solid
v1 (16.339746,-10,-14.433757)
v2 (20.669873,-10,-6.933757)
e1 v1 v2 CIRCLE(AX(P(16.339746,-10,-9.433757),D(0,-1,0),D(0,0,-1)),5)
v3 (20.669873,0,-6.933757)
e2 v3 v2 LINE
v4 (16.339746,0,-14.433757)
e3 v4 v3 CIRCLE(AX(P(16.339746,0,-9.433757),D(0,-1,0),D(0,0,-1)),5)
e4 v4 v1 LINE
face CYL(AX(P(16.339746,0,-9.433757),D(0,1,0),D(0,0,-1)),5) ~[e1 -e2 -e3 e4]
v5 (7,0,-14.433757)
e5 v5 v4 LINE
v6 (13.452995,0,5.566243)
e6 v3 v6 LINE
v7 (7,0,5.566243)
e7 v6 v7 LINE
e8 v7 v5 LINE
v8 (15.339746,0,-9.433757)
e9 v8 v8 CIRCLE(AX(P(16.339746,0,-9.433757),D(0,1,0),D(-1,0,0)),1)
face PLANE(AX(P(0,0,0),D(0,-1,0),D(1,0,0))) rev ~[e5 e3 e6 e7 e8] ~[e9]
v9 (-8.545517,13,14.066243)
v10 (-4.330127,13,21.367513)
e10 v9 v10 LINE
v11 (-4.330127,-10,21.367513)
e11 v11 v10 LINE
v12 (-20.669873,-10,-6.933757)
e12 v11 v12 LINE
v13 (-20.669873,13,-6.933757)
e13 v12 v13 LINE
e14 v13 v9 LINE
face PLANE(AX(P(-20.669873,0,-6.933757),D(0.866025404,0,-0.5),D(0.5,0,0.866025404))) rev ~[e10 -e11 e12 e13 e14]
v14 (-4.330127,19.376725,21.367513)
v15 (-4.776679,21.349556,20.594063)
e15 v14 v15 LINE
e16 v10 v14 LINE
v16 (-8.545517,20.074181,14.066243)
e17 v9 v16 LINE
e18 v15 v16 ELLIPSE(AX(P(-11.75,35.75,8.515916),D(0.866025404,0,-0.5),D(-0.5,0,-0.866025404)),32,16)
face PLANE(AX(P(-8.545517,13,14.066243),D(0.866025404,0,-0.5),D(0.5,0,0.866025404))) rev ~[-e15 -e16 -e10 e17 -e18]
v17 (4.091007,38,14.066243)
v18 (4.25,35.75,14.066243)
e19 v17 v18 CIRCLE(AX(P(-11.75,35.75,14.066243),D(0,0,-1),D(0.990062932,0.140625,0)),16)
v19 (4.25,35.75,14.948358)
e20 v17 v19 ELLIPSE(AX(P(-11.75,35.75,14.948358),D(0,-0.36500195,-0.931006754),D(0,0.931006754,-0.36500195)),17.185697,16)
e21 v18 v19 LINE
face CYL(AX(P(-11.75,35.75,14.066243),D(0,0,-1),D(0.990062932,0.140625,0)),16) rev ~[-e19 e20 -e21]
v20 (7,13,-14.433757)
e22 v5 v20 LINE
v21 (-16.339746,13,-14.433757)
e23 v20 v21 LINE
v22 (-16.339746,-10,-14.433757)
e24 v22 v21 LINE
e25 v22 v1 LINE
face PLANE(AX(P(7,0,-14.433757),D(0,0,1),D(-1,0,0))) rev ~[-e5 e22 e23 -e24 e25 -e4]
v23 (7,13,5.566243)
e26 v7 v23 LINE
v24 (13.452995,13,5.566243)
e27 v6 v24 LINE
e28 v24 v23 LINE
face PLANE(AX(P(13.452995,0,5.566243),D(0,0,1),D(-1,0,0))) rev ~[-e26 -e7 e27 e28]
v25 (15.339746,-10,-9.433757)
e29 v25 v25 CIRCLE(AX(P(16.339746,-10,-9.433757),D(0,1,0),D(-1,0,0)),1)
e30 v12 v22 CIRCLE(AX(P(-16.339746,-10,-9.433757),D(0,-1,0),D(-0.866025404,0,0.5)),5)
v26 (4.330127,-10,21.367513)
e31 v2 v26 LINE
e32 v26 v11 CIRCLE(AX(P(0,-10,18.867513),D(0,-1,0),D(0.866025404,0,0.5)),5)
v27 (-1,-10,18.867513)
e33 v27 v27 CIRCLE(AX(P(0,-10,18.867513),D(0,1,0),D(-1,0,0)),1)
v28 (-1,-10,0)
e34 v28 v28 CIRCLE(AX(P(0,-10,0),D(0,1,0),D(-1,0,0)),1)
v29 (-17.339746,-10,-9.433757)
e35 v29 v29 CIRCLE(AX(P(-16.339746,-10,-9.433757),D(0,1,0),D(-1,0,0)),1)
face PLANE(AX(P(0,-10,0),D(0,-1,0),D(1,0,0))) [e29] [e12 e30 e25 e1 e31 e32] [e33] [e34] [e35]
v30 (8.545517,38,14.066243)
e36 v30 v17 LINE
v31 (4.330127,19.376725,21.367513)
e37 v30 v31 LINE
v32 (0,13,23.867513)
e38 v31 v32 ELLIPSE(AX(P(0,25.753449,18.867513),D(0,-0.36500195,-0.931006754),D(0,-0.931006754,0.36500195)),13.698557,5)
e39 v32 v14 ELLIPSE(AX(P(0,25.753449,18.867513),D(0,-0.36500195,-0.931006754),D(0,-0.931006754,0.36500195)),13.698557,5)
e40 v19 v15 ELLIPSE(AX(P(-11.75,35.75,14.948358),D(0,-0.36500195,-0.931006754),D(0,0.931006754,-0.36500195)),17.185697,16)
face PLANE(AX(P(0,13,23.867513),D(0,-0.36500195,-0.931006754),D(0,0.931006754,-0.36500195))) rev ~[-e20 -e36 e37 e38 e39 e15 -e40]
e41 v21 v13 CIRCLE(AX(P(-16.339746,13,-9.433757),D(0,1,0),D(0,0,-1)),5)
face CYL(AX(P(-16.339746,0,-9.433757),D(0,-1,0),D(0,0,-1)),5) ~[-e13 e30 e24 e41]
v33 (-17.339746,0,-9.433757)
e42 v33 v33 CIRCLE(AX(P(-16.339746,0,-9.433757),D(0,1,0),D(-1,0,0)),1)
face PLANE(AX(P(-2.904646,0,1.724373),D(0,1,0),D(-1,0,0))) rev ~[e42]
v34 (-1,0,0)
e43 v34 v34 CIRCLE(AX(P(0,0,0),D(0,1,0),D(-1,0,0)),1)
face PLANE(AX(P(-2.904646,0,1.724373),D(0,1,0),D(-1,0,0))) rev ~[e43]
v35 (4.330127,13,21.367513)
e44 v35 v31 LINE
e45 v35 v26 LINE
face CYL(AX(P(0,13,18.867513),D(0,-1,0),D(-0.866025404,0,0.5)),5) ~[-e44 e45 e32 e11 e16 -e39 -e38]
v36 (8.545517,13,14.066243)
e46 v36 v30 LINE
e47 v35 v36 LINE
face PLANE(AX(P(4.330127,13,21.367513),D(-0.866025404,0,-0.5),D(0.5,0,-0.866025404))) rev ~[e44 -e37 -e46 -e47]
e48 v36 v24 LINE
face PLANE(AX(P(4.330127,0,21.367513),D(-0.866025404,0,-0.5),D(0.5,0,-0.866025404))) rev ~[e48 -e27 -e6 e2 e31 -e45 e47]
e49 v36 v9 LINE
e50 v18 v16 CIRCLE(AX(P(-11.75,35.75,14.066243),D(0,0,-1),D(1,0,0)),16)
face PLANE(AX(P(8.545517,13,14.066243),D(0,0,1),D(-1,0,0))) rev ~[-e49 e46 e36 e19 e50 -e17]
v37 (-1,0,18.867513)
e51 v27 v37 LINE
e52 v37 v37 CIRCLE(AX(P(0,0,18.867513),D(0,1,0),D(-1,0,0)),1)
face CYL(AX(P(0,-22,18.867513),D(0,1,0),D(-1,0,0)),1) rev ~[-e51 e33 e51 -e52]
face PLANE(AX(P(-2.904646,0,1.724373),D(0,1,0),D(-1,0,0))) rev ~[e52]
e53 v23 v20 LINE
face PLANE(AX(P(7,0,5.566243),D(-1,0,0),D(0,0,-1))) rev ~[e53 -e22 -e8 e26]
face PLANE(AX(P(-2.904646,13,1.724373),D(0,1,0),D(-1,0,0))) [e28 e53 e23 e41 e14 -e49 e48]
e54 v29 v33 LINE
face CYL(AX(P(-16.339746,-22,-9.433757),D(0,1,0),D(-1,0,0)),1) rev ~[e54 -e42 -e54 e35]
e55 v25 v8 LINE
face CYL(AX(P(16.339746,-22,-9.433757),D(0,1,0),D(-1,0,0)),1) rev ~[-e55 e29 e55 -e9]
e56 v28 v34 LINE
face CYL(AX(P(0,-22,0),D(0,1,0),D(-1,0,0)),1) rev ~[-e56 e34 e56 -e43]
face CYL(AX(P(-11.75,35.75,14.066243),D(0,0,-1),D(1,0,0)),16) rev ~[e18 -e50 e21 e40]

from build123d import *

# Parameters (mm, degrees)
F1_DEPTH  = 10
F3_D      = 2
F3_DEPTH  = 12
F3_TIP    = 0.600860619
F4_R      = 1
F5_DEPTH  = 13
F7_DEPTH  = 25
F9_DEPTH  = 9.8022701892
F11_DEPTH = 12.5


with BuildPart() as f1:
    # F0 (on Front) → F1 (new body)
    with BuildSketch(Plane.XZ):
        with BuildLine():
            Line((-4.3301270189, 21.3675134595), (-20.6698729811, -6.9337567297))
            ThreePointArc((-20.6698729811, -6.9337567297), (-20.6698729811, -11.9337567297), (-16.3397459622, -14.4337567297))
            Line((-16.3397459622, -14.4337567297), (16.3397459622, -14.4337567297))
            ThreePointArc((16.3397459622, -14.4337567297), (20.6698729811, -11.9337567297), (20.6698729811, -6.9337567297))
            Line((20.6698729811, -6.9337567297), (4.3301270189, 21.3675134595))
            ThreePointArc((4.3301270189, 21.3675134595), (0, 23.8675134595), (-4.3301270189, 21.3675134595))
        make_face()
    extrude(amount=F1_DEPTH)

    # F3
    with Locations(Plane.XZ.offset(10)):
        with Locations((0, 18.8675134595), (0, 0), (16.3397459622, -9.4337567297), (-16.3397459622, -9.4337567297)):
            Hole(F3_D / 2, depth=F3_DEPTH)
            with Locations((0, 0, -(F3_DEPTH + F3_TIP / 2))):  # 118° drill point
                Cone(0, F3_D / 2, F3_TIP, mode=Mode.SUBTRACT)

    # F4 (on face) → F5 (join)
    with BuildSketch(Plane(origin=(0, 0, 0), x_dir=(-1, 0, 0), z_dir=(0, 1, 0))):
        with BuildLine():
            Line((-7, 5.5662432703), (-7, -14.4337567297))
            Line((-7, -14.4337567297), (16.3397459622, -14.4337567297))
            ThreePointArc((16.3397459622, -14.4337567297), (20.6698729811, -11.9337567297), (20.6698729811, -6.9337567297))
            Line((20.6698729811, -6.9337567297), (4.3301270189, 21.3675134595))
            ThreePointArc((4.3301270189, 21.3675134595), (0, 23.8675134595), (-4.3301270189, 21.3675134595))
            Line((-4.3301270189, 21.3675134595), (-13.4529946162, 5.5662432703))
            Line((-13.4529946162, 5.5662432703), (-7, 5.5662432703))
        make_face()
        with Locations((16.3397459622, -9.4337567297)):
            Circle(F4_R, mode=Mode.SUBTRACT)
        Circle(F4_R, mode=Mode.SUBTRACT)
        with Locations((0, 18.8675134595)):
            Circle(F4_R, mode=Mode.SUBTRACT)
        with Locations((16.3397459622, -9.4337567297)):
            Circle(F4_R)
        Circle(F4_R)
        with Locations((0, 18.8675134595)):
            Circle(F4_R)
    extrude(amount=F5_DEPTH)

    # F6 (on face) → F7 (join)
    with BuildSketch(Plane(origin=(0, 13, 0), x_dir=(-1, 0, 0), z_dir=(0, 1, 0))):
        with BuildLine():
            Line((8.5455173281, 14.0662432703), (4.3301270189, 21.3675134595))
            ThreePointArc((4.3301270189, 21.3675134595), (0, 23.8675134595), (-4.3301270189, 21.3675134595))
            Line((-4.3301270189, 21.3675134595), (-8.5455173281, 14.0662432703))
            Line((-8.5455173281, 14.0662432703), (8.5455173281, 14.0662432703))
        make_face()
    extrude(amount=F7_DEPTH)

    # F8 (on face) → F9 (cut, through all)
    with BuildSketch(Plane(origin=(0, 0, 14.0662432703), x_dir=(1, 0, 0), z_dir=(0, 0, -1))):
        with BuildLine():
            Line((-8.5455173281, -38), (-8.5455173281, -20.0741813354))
            ThreePointArc((-8.5455173281, -20.0741813354), (-24.827324347, -44.9686543445), (4.0910069124, -38))
            Line((4.0910069124, -38), (-8.5455173281, -38))
        make_face()
        with BuildLine():
            ThreePointArc((4.0910069124, -38), (4.2102022324, -36.8778052582), (4.25, -35.75))
            ThreePointArc((4.25, -35.75), (0.6449933996, -25.6324835743), (-8.5455173281, -20.0741813354))
            Line((-8.5455173281, -20.0741813354), (-8.5455173281, -38))
            Line((-8.5455173281, -38), (4.0910069124, -38))
        make_face()
    extrude(amount=-F9_DEPTH, mode=Mode.SUBTRACT)

    # F10 (on Right) → F11 (cut, symmetric)
    with BuildSketch(Plane.YZ):
        Polygon((13, 23.8675134595), (38, 14.0662432703), (39, 14.0662432703), (39, 24.8675134595), (13, 24.8675134595), align=None)
    extrude(amount=F11_DEPTH, both=True, mode=Mode.SUBTRACT)


solid = f1.part
